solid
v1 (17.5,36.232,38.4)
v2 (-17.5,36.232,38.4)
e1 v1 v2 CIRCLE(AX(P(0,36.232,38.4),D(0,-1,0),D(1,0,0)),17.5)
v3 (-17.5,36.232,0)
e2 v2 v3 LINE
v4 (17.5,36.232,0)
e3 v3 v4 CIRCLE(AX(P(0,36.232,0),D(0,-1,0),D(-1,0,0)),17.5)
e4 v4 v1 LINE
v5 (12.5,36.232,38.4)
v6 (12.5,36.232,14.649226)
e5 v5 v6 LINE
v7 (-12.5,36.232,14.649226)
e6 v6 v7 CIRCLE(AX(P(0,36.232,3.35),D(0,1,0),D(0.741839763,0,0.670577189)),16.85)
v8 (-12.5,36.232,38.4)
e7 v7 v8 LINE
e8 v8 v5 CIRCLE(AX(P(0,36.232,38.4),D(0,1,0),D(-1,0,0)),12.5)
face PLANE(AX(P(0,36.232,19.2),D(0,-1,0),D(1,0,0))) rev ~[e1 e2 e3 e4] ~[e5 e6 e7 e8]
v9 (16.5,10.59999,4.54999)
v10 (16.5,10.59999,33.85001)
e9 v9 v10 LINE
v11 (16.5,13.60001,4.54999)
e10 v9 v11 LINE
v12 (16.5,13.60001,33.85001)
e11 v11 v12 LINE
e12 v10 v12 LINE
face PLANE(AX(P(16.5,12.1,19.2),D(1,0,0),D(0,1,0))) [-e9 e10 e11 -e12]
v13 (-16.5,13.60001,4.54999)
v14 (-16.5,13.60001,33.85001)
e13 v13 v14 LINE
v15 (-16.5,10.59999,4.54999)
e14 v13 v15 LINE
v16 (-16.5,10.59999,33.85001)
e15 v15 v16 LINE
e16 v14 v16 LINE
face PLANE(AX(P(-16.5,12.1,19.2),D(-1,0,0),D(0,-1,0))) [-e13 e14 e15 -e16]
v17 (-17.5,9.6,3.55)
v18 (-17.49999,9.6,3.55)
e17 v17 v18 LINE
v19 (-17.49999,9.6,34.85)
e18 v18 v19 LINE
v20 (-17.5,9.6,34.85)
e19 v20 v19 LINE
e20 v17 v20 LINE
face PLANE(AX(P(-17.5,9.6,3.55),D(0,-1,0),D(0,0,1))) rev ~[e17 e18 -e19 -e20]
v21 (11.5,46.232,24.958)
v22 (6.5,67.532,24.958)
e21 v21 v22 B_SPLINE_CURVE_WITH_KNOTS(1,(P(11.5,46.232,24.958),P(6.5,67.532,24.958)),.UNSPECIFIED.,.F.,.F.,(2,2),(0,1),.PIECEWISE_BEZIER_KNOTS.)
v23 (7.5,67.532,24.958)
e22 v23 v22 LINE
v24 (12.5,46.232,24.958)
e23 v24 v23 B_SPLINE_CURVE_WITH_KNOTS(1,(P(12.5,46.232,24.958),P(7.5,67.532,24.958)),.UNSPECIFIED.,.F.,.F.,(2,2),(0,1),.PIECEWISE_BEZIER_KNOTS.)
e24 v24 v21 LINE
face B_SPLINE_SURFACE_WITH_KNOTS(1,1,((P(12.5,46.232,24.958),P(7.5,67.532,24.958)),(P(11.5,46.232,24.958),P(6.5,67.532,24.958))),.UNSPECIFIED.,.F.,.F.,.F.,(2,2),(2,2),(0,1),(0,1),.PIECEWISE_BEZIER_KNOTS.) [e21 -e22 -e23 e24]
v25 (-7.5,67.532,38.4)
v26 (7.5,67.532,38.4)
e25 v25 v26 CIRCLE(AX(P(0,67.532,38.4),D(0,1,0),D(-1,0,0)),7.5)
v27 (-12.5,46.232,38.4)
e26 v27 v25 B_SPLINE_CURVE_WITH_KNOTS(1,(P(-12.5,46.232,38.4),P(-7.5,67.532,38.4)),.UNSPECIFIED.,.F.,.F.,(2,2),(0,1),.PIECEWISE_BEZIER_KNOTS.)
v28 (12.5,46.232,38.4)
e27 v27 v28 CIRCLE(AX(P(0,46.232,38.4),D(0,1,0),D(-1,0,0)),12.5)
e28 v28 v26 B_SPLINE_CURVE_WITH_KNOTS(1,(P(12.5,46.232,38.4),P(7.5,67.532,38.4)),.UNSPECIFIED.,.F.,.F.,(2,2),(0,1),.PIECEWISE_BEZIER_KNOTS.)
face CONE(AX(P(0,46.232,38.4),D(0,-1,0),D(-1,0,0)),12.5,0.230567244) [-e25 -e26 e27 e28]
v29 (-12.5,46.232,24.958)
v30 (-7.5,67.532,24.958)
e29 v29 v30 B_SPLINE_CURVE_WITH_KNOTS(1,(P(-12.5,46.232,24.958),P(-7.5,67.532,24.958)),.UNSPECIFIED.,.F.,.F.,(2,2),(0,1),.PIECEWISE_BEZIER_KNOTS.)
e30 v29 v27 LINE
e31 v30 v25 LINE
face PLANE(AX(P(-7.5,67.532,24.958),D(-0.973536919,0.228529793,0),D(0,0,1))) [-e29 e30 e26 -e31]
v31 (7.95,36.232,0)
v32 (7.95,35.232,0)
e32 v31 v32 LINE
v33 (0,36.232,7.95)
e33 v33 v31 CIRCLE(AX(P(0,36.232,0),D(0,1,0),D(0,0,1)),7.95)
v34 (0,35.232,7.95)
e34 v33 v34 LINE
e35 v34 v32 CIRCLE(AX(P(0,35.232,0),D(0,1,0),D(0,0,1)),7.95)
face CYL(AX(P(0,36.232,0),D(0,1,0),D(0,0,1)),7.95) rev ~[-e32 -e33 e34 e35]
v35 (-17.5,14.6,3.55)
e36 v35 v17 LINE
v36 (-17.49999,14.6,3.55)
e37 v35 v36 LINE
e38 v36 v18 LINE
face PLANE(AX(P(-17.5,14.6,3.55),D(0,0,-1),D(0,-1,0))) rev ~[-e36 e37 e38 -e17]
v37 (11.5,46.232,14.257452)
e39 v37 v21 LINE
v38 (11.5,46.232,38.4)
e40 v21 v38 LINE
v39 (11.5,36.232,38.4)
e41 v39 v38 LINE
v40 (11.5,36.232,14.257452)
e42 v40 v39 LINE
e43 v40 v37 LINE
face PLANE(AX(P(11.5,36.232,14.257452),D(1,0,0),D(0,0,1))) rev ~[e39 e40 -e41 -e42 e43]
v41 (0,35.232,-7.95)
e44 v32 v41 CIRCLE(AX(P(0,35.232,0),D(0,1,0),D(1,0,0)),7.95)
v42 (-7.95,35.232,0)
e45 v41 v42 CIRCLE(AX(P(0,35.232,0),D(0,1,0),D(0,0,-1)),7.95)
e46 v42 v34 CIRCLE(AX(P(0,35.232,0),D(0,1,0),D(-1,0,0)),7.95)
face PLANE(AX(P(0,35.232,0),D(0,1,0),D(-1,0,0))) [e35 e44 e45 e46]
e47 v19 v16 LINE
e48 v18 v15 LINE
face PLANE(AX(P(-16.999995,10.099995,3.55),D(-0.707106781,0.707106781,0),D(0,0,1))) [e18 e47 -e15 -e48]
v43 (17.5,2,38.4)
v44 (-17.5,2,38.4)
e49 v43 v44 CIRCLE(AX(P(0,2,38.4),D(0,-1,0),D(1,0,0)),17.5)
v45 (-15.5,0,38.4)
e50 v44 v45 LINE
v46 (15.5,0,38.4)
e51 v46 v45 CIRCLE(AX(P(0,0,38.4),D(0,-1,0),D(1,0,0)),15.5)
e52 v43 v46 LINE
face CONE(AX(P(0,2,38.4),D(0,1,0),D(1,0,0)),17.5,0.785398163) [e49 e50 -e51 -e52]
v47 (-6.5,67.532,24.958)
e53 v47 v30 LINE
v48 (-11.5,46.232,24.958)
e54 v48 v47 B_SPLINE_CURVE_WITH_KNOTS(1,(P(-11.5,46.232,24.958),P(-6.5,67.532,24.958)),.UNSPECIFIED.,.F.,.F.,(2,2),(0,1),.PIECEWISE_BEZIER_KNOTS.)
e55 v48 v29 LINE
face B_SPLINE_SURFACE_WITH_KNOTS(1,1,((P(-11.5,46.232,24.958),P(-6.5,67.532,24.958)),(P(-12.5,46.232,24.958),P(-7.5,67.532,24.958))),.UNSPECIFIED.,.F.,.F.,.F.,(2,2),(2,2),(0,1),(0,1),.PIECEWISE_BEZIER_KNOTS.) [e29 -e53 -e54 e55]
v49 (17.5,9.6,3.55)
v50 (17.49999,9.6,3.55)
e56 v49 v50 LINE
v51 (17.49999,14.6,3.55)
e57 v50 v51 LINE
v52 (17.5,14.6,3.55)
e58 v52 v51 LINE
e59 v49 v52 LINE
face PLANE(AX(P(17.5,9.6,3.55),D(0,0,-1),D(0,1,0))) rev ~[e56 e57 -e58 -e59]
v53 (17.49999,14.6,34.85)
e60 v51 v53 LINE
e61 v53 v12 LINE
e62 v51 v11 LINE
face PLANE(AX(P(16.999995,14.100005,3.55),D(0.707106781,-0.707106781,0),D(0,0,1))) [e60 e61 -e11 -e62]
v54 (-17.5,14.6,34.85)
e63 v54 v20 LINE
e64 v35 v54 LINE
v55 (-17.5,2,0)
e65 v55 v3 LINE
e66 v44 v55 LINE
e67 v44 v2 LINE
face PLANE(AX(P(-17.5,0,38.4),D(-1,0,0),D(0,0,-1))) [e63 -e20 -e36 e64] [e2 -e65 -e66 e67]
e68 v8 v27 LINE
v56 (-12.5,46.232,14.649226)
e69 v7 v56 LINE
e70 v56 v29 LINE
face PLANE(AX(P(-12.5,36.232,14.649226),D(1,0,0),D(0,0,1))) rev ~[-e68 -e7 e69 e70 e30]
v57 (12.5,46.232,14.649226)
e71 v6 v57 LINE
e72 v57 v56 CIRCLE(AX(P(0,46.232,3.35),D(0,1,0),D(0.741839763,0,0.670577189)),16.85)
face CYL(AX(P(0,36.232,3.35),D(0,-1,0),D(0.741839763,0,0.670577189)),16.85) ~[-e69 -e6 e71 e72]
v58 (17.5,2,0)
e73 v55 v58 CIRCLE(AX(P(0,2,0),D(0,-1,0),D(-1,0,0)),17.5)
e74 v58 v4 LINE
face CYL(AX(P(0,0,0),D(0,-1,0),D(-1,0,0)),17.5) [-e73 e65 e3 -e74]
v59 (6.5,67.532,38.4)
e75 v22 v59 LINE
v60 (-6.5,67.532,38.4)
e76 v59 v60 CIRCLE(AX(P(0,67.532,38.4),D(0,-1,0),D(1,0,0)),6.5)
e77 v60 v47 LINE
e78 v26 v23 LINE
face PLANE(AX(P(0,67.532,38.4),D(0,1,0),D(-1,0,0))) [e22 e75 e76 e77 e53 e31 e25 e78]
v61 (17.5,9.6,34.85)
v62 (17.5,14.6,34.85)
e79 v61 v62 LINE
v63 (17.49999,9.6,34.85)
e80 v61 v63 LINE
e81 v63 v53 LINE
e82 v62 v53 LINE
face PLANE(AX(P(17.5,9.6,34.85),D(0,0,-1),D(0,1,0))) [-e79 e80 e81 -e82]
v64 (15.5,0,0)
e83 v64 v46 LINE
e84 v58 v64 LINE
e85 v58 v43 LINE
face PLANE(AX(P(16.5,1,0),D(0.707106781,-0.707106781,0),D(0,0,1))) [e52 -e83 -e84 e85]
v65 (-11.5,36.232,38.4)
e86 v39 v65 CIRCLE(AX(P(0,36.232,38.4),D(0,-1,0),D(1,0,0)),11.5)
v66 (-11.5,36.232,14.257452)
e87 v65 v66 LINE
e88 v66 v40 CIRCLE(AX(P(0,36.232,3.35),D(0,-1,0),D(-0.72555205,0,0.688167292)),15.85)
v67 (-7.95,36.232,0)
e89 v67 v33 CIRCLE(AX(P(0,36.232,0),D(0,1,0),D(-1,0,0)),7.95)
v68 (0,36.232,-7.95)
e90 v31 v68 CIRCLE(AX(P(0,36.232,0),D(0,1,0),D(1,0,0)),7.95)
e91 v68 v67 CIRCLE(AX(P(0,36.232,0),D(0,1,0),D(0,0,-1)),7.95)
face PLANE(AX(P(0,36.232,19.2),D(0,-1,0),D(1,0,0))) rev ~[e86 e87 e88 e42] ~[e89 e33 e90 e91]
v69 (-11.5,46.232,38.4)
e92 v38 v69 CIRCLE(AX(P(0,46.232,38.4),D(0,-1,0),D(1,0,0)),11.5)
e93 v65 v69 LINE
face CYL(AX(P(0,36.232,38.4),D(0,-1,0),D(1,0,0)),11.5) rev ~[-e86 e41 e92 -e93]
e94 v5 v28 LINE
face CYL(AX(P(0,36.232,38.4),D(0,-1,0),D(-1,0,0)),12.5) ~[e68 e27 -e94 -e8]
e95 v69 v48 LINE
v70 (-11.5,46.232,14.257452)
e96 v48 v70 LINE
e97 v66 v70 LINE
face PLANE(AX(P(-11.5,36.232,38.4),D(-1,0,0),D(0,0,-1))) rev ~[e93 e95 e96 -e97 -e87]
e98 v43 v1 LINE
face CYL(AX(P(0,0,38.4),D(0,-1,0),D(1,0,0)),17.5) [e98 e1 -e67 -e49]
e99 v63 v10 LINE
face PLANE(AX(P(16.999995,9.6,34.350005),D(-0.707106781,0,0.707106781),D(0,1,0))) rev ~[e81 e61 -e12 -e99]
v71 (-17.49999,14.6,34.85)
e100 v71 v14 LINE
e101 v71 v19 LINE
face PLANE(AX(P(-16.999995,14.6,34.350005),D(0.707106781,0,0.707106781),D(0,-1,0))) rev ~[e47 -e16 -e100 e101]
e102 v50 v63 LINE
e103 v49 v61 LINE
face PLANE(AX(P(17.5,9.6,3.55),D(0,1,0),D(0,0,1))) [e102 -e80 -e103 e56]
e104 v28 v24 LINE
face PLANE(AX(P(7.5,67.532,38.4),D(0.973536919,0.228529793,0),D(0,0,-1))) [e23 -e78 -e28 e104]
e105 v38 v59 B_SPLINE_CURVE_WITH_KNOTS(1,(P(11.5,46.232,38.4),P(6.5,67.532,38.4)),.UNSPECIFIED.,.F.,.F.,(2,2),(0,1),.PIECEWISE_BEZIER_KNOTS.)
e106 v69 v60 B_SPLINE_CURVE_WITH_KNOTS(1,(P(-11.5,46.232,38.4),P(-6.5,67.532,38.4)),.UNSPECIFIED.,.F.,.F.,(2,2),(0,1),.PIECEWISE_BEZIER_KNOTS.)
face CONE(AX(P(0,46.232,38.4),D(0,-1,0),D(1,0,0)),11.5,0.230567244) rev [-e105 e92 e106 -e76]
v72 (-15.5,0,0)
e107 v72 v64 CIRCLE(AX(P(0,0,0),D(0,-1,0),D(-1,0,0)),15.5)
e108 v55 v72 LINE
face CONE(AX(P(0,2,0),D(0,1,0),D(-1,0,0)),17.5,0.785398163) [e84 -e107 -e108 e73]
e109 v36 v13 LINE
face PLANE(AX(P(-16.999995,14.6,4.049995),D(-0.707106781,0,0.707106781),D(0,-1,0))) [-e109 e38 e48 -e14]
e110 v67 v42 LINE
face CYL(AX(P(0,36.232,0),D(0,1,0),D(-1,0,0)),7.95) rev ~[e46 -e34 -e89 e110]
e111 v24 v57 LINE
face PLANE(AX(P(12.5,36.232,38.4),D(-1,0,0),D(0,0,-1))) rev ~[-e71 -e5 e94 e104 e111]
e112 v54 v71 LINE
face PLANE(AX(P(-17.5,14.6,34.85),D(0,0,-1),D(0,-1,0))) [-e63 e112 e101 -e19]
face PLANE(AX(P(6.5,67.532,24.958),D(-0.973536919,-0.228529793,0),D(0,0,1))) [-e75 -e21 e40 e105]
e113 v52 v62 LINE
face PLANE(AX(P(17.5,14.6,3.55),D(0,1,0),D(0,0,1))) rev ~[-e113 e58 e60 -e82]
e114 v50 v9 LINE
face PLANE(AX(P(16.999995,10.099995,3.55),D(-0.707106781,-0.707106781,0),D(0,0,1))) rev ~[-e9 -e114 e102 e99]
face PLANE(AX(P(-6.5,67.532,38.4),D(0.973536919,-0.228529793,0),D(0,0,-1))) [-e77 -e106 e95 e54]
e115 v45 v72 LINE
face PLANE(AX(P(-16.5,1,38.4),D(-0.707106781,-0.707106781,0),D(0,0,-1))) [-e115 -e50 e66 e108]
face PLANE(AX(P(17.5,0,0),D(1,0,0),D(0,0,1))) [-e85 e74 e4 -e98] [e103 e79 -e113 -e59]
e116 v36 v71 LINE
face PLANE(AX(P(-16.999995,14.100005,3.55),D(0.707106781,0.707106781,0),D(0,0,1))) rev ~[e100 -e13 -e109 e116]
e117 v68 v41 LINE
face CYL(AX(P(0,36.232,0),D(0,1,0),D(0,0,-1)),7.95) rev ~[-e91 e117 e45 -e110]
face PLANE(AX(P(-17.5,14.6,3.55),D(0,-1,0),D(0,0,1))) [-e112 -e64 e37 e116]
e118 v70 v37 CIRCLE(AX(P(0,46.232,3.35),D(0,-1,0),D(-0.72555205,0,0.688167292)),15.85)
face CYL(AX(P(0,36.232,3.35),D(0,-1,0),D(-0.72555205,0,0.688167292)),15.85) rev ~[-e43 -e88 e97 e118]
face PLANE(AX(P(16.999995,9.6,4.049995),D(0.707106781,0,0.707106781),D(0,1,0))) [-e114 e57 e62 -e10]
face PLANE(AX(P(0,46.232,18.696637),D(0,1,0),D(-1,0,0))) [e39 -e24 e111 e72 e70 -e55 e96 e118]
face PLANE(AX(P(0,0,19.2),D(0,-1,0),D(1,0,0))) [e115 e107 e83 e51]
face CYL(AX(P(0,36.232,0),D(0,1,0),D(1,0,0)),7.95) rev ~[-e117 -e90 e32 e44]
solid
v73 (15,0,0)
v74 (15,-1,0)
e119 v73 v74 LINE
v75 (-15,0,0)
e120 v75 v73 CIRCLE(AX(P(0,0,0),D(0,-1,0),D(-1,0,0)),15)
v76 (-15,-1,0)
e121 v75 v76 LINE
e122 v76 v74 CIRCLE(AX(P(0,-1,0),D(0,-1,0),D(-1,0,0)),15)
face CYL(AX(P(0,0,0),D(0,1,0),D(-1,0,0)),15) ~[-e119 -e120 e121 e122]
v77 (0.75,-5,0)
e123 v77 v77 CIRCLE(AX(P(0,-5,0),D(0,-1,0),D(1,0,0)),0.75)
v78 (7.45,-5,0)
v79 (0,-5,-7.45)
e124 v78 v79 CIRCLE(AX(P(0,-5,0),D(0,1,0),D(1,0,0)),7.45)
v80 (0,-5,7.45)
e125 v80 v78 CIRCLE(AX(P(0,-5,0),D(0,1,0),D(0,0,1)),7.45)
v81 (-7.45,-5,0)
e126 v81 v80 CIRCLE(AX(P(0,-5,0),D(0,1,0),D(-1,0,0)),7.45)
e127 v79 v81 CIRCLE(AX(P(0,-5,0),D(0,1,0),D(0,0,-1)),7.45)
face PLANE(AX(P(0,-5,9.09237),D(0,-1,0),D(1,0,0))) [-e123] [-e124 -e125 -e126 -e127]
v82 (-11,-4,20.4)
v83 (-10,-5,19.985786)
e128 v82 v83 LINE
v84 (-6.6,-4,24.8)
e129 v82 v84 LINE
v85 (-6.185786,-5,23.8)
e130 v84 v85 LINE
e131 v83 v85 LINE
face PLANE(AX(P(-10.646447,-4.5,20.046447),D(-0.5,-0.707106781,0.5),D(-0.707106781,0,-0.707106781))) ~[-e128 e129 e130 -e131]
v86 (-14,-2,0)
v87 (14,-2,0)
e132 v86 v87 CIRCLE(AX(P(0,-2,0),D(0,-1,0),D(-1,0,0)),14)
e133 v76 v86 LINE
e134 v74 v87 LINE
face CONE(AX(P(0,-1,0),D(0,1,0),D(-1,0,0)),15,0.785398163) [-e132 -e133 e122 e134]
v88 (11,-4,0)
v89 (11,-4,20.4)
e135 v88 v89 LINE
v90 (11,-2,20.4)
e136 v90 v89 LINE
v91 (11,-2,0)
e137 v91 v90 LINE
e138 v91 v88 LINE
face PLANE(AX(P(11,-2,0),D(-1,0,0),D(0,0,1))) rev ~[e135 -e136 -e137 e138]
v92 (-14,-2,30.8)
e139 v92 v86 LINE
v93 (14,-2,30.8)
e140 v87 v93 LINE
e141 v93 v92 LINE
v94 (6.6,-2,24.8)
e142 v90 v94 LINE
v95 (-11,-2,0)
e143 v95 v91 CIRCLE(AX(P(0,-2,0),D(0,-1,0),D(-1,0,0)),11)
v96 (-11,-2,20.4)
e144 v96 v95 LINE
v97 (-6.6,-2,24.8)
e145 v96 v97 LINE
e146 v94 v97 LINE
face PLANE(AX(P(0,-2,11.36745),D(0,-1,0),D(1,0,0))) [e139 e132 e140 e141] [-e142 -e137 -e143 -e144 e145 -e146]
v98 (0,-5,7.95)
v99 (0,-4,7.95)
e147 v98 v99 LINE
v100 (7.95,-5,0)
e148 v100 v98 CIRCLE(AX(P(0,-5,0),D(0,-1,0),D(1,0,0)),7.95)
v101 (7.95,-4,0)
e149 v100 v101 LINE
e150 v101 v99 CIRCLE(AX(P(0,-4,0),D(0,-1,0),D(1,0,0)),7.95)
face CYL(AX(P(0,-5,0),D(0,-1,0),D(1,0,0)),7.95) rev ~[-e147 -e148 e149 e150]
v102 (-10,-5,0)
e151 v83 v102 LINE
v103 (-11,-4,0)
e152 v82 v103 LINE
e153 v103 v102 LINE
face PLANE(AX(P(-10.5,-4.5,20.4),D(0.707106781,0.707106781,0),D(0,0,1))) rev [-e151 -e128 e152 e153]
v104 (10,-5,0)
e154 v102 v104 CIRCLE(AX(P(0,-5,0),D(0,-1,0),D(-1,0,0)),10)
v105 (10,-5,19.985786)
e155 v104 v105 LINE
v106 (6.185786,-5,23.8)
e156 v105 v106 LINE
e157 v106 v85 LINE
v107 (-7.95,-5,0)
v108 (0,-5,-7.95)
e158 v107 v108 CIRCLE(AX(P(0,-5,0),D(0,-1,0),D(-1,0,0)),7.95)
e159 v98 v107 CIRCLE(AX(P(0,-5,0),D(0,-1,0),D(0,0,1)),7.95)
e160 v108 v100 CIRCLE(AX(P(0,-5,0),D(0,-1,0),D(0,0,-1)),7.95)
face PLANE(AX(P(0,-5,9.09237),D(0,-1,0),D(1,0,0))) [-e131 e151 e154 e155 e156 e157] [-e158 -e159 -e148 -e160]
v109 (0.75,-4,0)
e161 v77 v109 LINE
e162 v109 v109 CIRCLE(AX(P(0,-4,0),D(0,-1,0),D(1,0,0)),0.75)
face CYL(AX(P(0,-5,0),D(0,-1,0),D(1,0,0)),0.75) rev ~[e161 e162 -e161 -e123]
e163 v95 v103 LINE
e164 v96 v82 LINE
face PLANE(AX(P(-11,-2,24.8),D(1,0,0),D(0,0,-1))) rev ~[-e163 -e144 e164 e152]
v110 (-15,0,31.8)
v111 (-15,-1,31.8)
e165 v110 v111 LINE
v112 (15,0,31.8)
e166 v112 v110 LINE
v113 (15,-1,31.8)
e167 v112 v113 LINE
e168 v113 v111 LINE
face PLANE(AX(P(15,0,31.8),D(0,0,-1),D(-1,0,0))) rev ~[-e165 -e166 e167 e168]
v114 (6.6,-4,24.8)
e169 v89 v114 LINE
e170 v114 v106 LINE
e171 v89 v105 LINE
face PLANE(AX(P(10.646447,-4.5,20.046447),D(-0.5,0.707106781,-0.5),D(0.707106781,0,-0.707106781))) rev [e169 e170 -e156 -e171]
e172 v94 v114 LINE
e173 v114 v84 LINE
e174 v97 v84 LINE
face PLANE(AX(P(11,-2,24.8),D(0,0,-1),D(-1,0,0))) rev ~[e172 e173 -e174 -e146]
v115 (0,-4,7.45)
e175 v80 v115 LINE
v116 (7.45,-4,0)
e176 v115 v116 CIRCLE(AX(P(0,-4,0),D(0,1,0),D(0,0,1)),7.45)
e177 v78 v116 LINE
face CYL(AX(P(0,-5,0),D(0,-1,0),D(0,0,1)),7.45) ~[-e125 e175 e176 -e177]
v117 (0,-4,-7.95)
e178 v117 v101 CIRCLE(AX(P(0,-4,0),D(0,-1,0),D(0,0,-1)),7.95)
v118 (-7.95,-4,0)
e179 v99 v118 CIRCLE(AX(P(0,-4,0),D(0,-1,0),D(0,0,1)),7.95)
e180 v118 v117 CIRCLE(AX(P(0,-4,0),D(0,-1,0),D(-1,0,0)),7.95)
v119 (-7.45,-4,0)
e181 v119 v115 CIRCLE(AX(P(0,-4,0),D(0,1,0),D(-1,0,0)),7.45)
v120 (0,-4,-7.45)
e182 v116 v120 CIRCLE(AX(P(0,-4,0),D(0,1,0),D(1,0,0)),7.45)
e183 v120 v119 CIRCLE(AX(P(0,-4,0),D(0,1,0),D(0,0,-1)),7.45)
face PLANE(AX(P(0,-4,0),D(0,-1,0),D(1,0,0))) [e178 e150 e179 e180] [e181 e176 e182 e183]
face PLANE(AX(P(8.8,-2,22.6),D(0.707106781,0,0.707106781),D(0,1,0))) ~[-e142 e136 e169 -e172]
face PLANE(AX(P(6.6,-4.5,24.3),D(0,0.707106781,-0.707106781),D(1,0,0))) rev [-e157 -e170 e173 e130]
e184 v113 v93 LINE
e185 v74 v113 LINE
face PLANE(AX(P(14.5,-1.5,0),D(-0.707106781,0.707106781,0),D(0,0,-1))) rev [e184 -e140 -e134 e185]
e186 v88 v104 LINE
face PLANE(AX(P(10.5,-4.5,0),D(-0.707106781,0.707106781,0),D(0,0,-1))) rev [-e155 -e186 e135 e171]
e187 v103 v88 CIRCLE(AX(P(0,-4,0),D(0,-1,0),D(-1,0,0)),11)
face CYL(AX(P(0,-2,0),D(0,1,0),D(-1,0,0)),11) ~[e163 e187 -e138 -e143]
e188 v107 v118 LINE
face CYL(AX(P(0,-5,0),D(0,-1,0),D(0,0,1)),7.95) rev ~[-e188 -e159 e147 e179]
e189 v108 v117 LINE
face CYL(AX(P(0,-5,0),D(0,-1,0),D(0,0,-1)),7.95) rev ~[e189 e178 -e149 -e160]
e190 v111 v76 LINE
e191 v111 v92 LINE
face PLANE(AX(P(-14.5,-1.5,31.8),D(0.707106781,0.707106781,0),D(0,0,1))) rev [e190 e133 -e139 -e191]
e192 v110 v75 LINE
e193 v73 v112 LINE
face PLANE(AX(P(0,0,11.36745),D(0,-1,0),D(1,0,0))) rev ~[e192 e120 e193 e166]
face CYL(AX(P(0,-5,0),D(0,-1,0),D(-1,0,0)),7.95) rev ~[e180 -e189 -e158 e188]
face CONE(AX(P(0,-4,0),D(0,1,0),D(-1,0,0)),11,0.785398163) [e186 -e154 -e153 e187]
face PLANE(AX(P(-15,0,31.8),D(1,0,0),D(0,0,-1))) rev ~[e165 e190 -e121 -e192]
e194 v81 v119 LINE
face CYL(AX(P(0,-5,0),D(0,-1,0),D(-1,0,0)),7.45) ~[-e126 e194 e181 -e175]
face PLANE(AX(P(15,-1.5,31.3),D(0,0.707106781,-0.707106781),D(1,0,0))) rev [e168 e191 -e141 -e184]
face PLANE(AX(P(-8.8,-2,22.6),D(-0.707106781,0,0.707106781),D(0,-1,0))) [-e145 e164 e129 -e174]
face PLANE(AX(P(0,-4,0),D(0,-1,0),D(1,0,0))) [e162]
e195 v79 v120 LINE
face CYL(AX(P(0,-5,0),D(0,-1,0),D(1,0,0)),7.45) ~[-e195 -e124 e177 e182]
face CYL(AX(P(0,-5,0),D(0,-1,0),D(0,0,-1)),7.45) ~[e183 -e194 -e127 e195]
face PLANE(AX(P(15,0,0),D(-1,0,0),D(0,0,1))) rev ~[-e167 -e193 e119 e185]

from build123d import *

# Parameters (mm, degrees)
F1_DEPTH  = 36.232
F2_DEPTH  = 2
F4_DEPTH  = 3
F5_SIZE   = 1
F6_SIZE   = 4.4
F7_SIZE   = 1
F8_R      = 0.75
F9_DEPTH  = 1
F10_SIZE  = 2
F11_W     = 5
F11_H     = 31.3
F12_DEPTH = 1
F13_W     = 5
F13_H     = 31.3
F14_DEPTH = 1
F15_SIZE  = 0.99999
F17_DEPTH = 10
F18_DEPTH = 1


# Not quite as in the source:
# - a fillet or chamfer is up to 0.001 mm smaller than in the source, because OpenCascade refuses the exact size


with BuildPart() as f1:
    # F0 (on Front) → F1 (new body)
    with BuildSketch(Plane.XZ):
        with BuildLine():
            Line((-17.5, 38.4), (-17.5, 0))
            ThreePointArc((-17.5, 0), (0, -17.5), (17.5, 0))
            Line((17.5, 0), (17.5, 38.4))
            ThreePointArc((17.5, 38.4), (0, 55.9), (-17.5, 38.4))
        make_face()
        with BuildLine():
            ThreePointArc((15, 0), (0, -15), (-15, 0))
            Line((-15, 0), (-15, 31.8))
            Line((-15, 31.8), (-15, 38.4))
            ThreePointArc((-15, 38.4), (0, 53.4), (15, 38.4))
            Line((15, 38.4), (15, 31.8))
            Line((15, 31.8), (15, 0))
        make_face(mode=Mode.SUBTRACT)
        with BuildLine():
            Line((-15, 31.8), (-15, 0))
            ThreePointArc((-15, 0), (0, -15), (15, 0))
            Line((15, 0), (15, 31.8))
            Line((15, 31.8), (-15, 31.8))
        make_face()
        with BuildLine():
            ThreePointArc((11, 0), (0, -11), (-11, 0))
            Line((-11, 0), (-11, 24.8))
            Line((-11, 24.8), (11, 24.8))
            Line((11, 24.8), (11, 0))
        make_face(mode=Mode.SUBTRACT)
        with BuildLine():
            Line((-11, 24.8), (-11, 0))
            ThreePointArc((-11, 0), (0, -11), (11, 0))
            Line((11, 0), (11, 24.8))
            Line((11, 24.8), (-11, 24.8))
        make_face()
        with BuildLine():
            ThreePointArc((0, -7.95), (-5.6214989104, -5.6214989104), (-7.95, 0))
            ThreePointArc((-7.95, 0), (-5.6214989104, 5.6214989104), (0, 7.95))
            ThreePointArc((0, 7.95), (5.6214989104, 5.6214989104), (7.95, 0))
            ThreePointArc((7.95, 0), (5.6214989104, -5.6214989104), (0, -7.95))
        make_face(mode=Mode.SUBTRACT)
        with BuildLine():
            Line((-15, 38.4), (-15, 31.8))
            Line((-15, 31.8), (15, 31.8))
            Line((15, 31.8), (15, 38.4))
            ThreePointArc((15, 38.4), (0, 53.4), (-15, 38.4))
        make_face()
        with BuildLine():
            ThreePointArc((0, 7.95), (-5.6214989104, 5.6214989104), (-7.95, 0))
            ThreePointArc((-7.95, 0), (-5.6214989104, -5.6214989104), (0, -7.95))
            ThreePointArc((0, -7.95), (5.6214989104, -5.6214989104), (7.95, 0))
            ThreePointArc((7.95, 0), (5.6214989104, 5.6214989104), (0, 7.95))
        make_face()
    extrude(amount=-F1_DEPTH)

    # F10
    f10_edges = [f1.edges().sort_by_distance(p)[0] for p in [
        (-17.5, 0, 19.2),
    ]]
    chamfer(f10_edges, length=F10_SIZE)

    # F11 (on face) → F12 (cut)
    with BuildSketch(Plane(origin=(-17.5, 0, 0), x_dir=(0, -1, 0), z_dir=(-1, 0, 0))):
        with Locations((-12.1, 19.2)):
            Rectangle(F11_W, F11_H)
    extrude(amount=-F12_DEPTH, mode=Mode.SUBTRACT)

    # F13 (on face) → F14 (cut)
    with BuildSketch(Plane.YZ.offset(17.5)):
        with Locations((12.1, 19.2)):
            Rectangle(F13_W, F13_H)
    extrude(amount=-F14_DEPTH, mode=Mode.SUBTRACT)

    # F15 (size 1 in the source; OpenCascade refuses exactly that, so slightly less here)
    f15_edges = [f1.edges().sort_by_distance(p)[0] for p in [
        (16.5, 14.6, 19.2),
        (16.5, 9.6, 19.2),
        (16.5, 12.1, 34.85),
        (16.5, 12.1, 3.55),
        (-16.5, 12.1, 3.55),
        (-16.5, 9.6, 19.2),
        (-16.5, 12.1, 34.85),
        (-16.5, 14.6, 19.2),
    ]]
    chamfer(f15_edges, length=F15_SIZE)

    # F16 (on face) → F17 (join)
    with BuildSketch(Plane(origin=(0, 36.232, 0), x_dir=(-1, 0, 0), z_dir=(0, 1, 0))):
        with BuildLine():
            ThreePointArc((12.5, 38.4), (0, 50.9), (-12.5, 38.4))
            Line((-12.5, 38.4), (-12.5, 14.6492256372))
            ThreePointArc((-12.5, 14.6492256372), (0, -13.5), (12.5, 14.6492256372))
            Line((12.5, 14.6492256372), (12.5, 38.4))
        make_face()
        with BuildLine():
            ThreePointArc((-11.5, 38.4), (0, 49.9), (11.5, 38.4))
            Line((11.5, 38.4), (11.5, 14.2574515814))
            ThreePointArc((11.5, 14.2574515814), (0, -12.5), (-11.5, 14.2574515814))
            Line((-11.5, 14.2574515814), (-11.5, 38.4))
        make_face(mode=Mode.SUBTRACT)
    extrude(amount=F17_DEPTH)

    # F16 (on face) → F18 (cut)
    with BuildSketch(Plane(origin=(0, 36.232, 0), x_dir=(-1, 0, 0), z_dir=(0, 1, 0))):
        with BuildLine():
            ThreePointArc((0, -7.95), (5.6214989104, -5.6214989104), (7.95, 0))
            ThreePointArc((7.95, 0), (5.6214989104, 5.6214989104), (0, 7.95))
            ThreePointArc((0, 7.95), (-5.6214989104, 5.6214989104), (-7.95, 0))
            ThreePointArc((-7.95, 0), (-5.6214989104, -5.6214989104), (0, -7.95))
        make_face()
    extrude(amount=-F18_DEPTH, mode=Mode.SUBTRACT)

    # F19 (on face) → F22 section 0
    with BuildSketch(Plane(origin=(0, 46.232, 0), x_dir=(-1, 0, 0), z_dir=(0, 1, 0))):
        with BuildLine():
            Line((12.5, 24.958), (12.5, 38.4))
            ThreePointArc((12.5, 38.4), (0, 50.9), (-12.5, 38.4))
            Line((-12.5, 38.4), (-12.5, 24.958))
            Line((-12.5, 24.958), (-11.5, 24.958))
            Line((-11.5, 24.958), (-11.5, 38.4))
            ThreePointArc((-11.5, 38.4), (0, 49.9), (11.5, 38.4))
            Line((11.5, 38.4), (11.5, 24.958))
            Line((11.5, 24.958), (12.5, 24.958))
        make_face()
    # F21 (on offset) → F22 section 1
    with BuildSketch(Plane(origin=(0, 67.532, 0), x_dir=(-1, 0, 0), z_dir=(0, 1, 0))):
        with BuildLine():
            ThreePointArc((7.5, 38.4), (0, 45.9), (-7.5, 38.4))
            Line((-7.5, 38.4), (-7.5, 24.958))
            Line((-7.5, 24.958), (-6.5, 24.958))
            Line((-6.5, 24.958), (-6.5, 38.4))
            ThreePointArc((-6.5, 38.4), (0, 44.9), (6.5, 38.4))
            Line((6.5, 38.4), (6.5, 24.958))
            Line((6.5, 24.958), (7.5, 24.958))
            Line((7.5, 24.958), (7.5, 38.4))
        make_face()
    loft()


with BuildPart() as f2:
    # F0 (on Front) → F2 (new body)
    with BuildSketch(Plane.XZ):
        with BuildLine():
            Line((-15, 31.8), (-15, 0))
            ThreePointArc((-15, 0), (0, -15), (15, 0))
            Line((15, 0), (15, 31.8))
            Line((15, 31.8), (-15, 31.8))
        make_face()
        with BuildLine():
            ThreePointArc((11, 0), (0, -11), (-11, 0))
            Line((-11, 0), (-11, 24.8))
            Line((-11, 24.8), (11, 24.8))
            Line((11, 24.8), (11, 0))
        make_face(mode=Mode.SUBTRACT)
        with BuildLine():
            Line((-11, 24.8), (-11, 0))
            ThreePointArc((-11, 0), (0, -11), (11, 0))
            Line((11, 0), (11, 24.8))
            Line((11, 24.8), (-11, 24.8))
        make_face()
        with BuildLine():
            ThreePointArc((0, -7.95), (-5.6214989104, -5.6214989104), (-7.95, 0))
            ThreePointArc((-7.95, 0), (-5.6214989104, 5.6214989104), (0, 7.95))
            ThreePointArc((0, 7.95), (5.6214989104, 5.6214989104), (7.95, 0))
            ThreePointArc((7.95, 0), (5.6214989104, -5.6214989104), (0, -7.95))
        make_face(mode=Mode.SUBTRACT)
        with BuildLine():
            ThreePointArc((0, 7.95), (-5.6214989104, 5.6214989104), (-7.95, 0))
            ThreePointArc((-7.95, 0), (-5.6214989104, -5.6214989104), (0, -7.95))
            ThreePointArc((0, -7.95), (5.6214989104, -5.6214989104), (7.95, 0))
            ThreePointArc((7.95, 0), (5.6214989104, 5.6214989104), (0, 7.95))
        make_face()
    extrude(amount=F2_DEPTH)

    # F3 (on face) → F4 (join)
    with BuildSketch(Plane.XZ.offset(2)):
        with BuildLine():
            Line((-11, 24.8), (-11, 0))
            ThreePointArc((-11, 0), (0, -11), (11, 0))
            Line((11, 0), (11, 24.8))
            Line((11, 24.8), (-11, 24.8))
        make_face()
        with BuildLine():
            ThreePointArc((0, 7.95), (5.6214989104, 5.6214989104), (7.95, 0))
            ThreePointArc((7.95, 0), (5.6214989104, -5.6214989104), (0, -7.95))
            ThreePointArc((0, -7.95), (-5.6214989104, -5.6214989104), (-7.95, 0))
            ThreePointArc((-7.95, 0), (-5.6214989104, 5.6214989104), (0, 7.95))
        make_face(mode=Mode.SUBTRACT)
        with BuildLine():
            ThreePointArc((0, -7.95), (5.6214989104, -5.6214989104), (7.95, 0))
            ThreePointArc((7.95, 0), (5.6214989104, 5.6214989104), (0, 7.95))
            ThreePointArc((0, 7.95), (-5.6214989104, 5.6214989104), (-7.95, 0))
            ThreePointArc((-7.95, 0), (-5.6214989104, -5.6214989104), (0, -7.95))
        make_face()
    extrude(amount=F4_DEPTH)

    # F5
    f5_edges = [f2.edges().sort_by_distance(p)[0] for p in [
        (0, -2, 31.8),
        (-15, -2, 15.9),
    ]]
    chamfer(f5_edges, length=F5_SIZE)

    # F6
    f6_edges = [f2.edges().sort_by_distance(p)[0] for p in [
        (11, -3.5, 24.8),
        (-11, -3.5, 24.8),
    ]]
    chamfer(f6_edges, length=F6_SIZE)

    # F7
    f7_edges = [f2.edges().sort_by_distance(p)[0] for p in [
        (-11, -5, 10.2),
        (0, -5, 24.8),
        (-8.8, -5, 22.6),
        (8.8, -5, 22.6),
    ]]
    chamfer(f7_edges, length=F7_SIZE)

    # F8 (on face) → F9 (cut)
    with BuildSketch(Plane.XZ.offset(5)):
        with BuildLine():
            ThreePointArc((0, 7.95), (-5.6214989104, 5.6214989104), (-7.95, 0))
            ThreePointArc((-7.95, 0), (-5.6214989104, -5.6214989104), (0, -7.95))
            ThreePointArc((0, -7.95), (5.6214989104, -5.6214989104), (7.95, 0))
            ThreePointArc((7.95, 0), (5.6214989104, 5.6214989104), (0, 7.95))
        make_face()
        with BuildLine():
            ThreePointArc((0, -7.45), (-5.2679455198, -5.2679455198), (-7.45, 0))
            ThreePointArc((-7.45, 0), (-5.2679455198, 5.2679455198), (0, 7.45))
            ThreePointArc((0, 7.45), (5.2679455198, 5.2679455198), (7.45, 0))
            ThreePointArc((7.45, 0), (5.2679455198, -5.2679455198), (0, -7.45))
        make_face(mode=Mode.SUBTRACT)
        Circle(F8_R)
    extrude(amount=-F9_DEPTH, mode=Mode.SUBTRACT)


solid = Compound([f1.part, f2.part])
